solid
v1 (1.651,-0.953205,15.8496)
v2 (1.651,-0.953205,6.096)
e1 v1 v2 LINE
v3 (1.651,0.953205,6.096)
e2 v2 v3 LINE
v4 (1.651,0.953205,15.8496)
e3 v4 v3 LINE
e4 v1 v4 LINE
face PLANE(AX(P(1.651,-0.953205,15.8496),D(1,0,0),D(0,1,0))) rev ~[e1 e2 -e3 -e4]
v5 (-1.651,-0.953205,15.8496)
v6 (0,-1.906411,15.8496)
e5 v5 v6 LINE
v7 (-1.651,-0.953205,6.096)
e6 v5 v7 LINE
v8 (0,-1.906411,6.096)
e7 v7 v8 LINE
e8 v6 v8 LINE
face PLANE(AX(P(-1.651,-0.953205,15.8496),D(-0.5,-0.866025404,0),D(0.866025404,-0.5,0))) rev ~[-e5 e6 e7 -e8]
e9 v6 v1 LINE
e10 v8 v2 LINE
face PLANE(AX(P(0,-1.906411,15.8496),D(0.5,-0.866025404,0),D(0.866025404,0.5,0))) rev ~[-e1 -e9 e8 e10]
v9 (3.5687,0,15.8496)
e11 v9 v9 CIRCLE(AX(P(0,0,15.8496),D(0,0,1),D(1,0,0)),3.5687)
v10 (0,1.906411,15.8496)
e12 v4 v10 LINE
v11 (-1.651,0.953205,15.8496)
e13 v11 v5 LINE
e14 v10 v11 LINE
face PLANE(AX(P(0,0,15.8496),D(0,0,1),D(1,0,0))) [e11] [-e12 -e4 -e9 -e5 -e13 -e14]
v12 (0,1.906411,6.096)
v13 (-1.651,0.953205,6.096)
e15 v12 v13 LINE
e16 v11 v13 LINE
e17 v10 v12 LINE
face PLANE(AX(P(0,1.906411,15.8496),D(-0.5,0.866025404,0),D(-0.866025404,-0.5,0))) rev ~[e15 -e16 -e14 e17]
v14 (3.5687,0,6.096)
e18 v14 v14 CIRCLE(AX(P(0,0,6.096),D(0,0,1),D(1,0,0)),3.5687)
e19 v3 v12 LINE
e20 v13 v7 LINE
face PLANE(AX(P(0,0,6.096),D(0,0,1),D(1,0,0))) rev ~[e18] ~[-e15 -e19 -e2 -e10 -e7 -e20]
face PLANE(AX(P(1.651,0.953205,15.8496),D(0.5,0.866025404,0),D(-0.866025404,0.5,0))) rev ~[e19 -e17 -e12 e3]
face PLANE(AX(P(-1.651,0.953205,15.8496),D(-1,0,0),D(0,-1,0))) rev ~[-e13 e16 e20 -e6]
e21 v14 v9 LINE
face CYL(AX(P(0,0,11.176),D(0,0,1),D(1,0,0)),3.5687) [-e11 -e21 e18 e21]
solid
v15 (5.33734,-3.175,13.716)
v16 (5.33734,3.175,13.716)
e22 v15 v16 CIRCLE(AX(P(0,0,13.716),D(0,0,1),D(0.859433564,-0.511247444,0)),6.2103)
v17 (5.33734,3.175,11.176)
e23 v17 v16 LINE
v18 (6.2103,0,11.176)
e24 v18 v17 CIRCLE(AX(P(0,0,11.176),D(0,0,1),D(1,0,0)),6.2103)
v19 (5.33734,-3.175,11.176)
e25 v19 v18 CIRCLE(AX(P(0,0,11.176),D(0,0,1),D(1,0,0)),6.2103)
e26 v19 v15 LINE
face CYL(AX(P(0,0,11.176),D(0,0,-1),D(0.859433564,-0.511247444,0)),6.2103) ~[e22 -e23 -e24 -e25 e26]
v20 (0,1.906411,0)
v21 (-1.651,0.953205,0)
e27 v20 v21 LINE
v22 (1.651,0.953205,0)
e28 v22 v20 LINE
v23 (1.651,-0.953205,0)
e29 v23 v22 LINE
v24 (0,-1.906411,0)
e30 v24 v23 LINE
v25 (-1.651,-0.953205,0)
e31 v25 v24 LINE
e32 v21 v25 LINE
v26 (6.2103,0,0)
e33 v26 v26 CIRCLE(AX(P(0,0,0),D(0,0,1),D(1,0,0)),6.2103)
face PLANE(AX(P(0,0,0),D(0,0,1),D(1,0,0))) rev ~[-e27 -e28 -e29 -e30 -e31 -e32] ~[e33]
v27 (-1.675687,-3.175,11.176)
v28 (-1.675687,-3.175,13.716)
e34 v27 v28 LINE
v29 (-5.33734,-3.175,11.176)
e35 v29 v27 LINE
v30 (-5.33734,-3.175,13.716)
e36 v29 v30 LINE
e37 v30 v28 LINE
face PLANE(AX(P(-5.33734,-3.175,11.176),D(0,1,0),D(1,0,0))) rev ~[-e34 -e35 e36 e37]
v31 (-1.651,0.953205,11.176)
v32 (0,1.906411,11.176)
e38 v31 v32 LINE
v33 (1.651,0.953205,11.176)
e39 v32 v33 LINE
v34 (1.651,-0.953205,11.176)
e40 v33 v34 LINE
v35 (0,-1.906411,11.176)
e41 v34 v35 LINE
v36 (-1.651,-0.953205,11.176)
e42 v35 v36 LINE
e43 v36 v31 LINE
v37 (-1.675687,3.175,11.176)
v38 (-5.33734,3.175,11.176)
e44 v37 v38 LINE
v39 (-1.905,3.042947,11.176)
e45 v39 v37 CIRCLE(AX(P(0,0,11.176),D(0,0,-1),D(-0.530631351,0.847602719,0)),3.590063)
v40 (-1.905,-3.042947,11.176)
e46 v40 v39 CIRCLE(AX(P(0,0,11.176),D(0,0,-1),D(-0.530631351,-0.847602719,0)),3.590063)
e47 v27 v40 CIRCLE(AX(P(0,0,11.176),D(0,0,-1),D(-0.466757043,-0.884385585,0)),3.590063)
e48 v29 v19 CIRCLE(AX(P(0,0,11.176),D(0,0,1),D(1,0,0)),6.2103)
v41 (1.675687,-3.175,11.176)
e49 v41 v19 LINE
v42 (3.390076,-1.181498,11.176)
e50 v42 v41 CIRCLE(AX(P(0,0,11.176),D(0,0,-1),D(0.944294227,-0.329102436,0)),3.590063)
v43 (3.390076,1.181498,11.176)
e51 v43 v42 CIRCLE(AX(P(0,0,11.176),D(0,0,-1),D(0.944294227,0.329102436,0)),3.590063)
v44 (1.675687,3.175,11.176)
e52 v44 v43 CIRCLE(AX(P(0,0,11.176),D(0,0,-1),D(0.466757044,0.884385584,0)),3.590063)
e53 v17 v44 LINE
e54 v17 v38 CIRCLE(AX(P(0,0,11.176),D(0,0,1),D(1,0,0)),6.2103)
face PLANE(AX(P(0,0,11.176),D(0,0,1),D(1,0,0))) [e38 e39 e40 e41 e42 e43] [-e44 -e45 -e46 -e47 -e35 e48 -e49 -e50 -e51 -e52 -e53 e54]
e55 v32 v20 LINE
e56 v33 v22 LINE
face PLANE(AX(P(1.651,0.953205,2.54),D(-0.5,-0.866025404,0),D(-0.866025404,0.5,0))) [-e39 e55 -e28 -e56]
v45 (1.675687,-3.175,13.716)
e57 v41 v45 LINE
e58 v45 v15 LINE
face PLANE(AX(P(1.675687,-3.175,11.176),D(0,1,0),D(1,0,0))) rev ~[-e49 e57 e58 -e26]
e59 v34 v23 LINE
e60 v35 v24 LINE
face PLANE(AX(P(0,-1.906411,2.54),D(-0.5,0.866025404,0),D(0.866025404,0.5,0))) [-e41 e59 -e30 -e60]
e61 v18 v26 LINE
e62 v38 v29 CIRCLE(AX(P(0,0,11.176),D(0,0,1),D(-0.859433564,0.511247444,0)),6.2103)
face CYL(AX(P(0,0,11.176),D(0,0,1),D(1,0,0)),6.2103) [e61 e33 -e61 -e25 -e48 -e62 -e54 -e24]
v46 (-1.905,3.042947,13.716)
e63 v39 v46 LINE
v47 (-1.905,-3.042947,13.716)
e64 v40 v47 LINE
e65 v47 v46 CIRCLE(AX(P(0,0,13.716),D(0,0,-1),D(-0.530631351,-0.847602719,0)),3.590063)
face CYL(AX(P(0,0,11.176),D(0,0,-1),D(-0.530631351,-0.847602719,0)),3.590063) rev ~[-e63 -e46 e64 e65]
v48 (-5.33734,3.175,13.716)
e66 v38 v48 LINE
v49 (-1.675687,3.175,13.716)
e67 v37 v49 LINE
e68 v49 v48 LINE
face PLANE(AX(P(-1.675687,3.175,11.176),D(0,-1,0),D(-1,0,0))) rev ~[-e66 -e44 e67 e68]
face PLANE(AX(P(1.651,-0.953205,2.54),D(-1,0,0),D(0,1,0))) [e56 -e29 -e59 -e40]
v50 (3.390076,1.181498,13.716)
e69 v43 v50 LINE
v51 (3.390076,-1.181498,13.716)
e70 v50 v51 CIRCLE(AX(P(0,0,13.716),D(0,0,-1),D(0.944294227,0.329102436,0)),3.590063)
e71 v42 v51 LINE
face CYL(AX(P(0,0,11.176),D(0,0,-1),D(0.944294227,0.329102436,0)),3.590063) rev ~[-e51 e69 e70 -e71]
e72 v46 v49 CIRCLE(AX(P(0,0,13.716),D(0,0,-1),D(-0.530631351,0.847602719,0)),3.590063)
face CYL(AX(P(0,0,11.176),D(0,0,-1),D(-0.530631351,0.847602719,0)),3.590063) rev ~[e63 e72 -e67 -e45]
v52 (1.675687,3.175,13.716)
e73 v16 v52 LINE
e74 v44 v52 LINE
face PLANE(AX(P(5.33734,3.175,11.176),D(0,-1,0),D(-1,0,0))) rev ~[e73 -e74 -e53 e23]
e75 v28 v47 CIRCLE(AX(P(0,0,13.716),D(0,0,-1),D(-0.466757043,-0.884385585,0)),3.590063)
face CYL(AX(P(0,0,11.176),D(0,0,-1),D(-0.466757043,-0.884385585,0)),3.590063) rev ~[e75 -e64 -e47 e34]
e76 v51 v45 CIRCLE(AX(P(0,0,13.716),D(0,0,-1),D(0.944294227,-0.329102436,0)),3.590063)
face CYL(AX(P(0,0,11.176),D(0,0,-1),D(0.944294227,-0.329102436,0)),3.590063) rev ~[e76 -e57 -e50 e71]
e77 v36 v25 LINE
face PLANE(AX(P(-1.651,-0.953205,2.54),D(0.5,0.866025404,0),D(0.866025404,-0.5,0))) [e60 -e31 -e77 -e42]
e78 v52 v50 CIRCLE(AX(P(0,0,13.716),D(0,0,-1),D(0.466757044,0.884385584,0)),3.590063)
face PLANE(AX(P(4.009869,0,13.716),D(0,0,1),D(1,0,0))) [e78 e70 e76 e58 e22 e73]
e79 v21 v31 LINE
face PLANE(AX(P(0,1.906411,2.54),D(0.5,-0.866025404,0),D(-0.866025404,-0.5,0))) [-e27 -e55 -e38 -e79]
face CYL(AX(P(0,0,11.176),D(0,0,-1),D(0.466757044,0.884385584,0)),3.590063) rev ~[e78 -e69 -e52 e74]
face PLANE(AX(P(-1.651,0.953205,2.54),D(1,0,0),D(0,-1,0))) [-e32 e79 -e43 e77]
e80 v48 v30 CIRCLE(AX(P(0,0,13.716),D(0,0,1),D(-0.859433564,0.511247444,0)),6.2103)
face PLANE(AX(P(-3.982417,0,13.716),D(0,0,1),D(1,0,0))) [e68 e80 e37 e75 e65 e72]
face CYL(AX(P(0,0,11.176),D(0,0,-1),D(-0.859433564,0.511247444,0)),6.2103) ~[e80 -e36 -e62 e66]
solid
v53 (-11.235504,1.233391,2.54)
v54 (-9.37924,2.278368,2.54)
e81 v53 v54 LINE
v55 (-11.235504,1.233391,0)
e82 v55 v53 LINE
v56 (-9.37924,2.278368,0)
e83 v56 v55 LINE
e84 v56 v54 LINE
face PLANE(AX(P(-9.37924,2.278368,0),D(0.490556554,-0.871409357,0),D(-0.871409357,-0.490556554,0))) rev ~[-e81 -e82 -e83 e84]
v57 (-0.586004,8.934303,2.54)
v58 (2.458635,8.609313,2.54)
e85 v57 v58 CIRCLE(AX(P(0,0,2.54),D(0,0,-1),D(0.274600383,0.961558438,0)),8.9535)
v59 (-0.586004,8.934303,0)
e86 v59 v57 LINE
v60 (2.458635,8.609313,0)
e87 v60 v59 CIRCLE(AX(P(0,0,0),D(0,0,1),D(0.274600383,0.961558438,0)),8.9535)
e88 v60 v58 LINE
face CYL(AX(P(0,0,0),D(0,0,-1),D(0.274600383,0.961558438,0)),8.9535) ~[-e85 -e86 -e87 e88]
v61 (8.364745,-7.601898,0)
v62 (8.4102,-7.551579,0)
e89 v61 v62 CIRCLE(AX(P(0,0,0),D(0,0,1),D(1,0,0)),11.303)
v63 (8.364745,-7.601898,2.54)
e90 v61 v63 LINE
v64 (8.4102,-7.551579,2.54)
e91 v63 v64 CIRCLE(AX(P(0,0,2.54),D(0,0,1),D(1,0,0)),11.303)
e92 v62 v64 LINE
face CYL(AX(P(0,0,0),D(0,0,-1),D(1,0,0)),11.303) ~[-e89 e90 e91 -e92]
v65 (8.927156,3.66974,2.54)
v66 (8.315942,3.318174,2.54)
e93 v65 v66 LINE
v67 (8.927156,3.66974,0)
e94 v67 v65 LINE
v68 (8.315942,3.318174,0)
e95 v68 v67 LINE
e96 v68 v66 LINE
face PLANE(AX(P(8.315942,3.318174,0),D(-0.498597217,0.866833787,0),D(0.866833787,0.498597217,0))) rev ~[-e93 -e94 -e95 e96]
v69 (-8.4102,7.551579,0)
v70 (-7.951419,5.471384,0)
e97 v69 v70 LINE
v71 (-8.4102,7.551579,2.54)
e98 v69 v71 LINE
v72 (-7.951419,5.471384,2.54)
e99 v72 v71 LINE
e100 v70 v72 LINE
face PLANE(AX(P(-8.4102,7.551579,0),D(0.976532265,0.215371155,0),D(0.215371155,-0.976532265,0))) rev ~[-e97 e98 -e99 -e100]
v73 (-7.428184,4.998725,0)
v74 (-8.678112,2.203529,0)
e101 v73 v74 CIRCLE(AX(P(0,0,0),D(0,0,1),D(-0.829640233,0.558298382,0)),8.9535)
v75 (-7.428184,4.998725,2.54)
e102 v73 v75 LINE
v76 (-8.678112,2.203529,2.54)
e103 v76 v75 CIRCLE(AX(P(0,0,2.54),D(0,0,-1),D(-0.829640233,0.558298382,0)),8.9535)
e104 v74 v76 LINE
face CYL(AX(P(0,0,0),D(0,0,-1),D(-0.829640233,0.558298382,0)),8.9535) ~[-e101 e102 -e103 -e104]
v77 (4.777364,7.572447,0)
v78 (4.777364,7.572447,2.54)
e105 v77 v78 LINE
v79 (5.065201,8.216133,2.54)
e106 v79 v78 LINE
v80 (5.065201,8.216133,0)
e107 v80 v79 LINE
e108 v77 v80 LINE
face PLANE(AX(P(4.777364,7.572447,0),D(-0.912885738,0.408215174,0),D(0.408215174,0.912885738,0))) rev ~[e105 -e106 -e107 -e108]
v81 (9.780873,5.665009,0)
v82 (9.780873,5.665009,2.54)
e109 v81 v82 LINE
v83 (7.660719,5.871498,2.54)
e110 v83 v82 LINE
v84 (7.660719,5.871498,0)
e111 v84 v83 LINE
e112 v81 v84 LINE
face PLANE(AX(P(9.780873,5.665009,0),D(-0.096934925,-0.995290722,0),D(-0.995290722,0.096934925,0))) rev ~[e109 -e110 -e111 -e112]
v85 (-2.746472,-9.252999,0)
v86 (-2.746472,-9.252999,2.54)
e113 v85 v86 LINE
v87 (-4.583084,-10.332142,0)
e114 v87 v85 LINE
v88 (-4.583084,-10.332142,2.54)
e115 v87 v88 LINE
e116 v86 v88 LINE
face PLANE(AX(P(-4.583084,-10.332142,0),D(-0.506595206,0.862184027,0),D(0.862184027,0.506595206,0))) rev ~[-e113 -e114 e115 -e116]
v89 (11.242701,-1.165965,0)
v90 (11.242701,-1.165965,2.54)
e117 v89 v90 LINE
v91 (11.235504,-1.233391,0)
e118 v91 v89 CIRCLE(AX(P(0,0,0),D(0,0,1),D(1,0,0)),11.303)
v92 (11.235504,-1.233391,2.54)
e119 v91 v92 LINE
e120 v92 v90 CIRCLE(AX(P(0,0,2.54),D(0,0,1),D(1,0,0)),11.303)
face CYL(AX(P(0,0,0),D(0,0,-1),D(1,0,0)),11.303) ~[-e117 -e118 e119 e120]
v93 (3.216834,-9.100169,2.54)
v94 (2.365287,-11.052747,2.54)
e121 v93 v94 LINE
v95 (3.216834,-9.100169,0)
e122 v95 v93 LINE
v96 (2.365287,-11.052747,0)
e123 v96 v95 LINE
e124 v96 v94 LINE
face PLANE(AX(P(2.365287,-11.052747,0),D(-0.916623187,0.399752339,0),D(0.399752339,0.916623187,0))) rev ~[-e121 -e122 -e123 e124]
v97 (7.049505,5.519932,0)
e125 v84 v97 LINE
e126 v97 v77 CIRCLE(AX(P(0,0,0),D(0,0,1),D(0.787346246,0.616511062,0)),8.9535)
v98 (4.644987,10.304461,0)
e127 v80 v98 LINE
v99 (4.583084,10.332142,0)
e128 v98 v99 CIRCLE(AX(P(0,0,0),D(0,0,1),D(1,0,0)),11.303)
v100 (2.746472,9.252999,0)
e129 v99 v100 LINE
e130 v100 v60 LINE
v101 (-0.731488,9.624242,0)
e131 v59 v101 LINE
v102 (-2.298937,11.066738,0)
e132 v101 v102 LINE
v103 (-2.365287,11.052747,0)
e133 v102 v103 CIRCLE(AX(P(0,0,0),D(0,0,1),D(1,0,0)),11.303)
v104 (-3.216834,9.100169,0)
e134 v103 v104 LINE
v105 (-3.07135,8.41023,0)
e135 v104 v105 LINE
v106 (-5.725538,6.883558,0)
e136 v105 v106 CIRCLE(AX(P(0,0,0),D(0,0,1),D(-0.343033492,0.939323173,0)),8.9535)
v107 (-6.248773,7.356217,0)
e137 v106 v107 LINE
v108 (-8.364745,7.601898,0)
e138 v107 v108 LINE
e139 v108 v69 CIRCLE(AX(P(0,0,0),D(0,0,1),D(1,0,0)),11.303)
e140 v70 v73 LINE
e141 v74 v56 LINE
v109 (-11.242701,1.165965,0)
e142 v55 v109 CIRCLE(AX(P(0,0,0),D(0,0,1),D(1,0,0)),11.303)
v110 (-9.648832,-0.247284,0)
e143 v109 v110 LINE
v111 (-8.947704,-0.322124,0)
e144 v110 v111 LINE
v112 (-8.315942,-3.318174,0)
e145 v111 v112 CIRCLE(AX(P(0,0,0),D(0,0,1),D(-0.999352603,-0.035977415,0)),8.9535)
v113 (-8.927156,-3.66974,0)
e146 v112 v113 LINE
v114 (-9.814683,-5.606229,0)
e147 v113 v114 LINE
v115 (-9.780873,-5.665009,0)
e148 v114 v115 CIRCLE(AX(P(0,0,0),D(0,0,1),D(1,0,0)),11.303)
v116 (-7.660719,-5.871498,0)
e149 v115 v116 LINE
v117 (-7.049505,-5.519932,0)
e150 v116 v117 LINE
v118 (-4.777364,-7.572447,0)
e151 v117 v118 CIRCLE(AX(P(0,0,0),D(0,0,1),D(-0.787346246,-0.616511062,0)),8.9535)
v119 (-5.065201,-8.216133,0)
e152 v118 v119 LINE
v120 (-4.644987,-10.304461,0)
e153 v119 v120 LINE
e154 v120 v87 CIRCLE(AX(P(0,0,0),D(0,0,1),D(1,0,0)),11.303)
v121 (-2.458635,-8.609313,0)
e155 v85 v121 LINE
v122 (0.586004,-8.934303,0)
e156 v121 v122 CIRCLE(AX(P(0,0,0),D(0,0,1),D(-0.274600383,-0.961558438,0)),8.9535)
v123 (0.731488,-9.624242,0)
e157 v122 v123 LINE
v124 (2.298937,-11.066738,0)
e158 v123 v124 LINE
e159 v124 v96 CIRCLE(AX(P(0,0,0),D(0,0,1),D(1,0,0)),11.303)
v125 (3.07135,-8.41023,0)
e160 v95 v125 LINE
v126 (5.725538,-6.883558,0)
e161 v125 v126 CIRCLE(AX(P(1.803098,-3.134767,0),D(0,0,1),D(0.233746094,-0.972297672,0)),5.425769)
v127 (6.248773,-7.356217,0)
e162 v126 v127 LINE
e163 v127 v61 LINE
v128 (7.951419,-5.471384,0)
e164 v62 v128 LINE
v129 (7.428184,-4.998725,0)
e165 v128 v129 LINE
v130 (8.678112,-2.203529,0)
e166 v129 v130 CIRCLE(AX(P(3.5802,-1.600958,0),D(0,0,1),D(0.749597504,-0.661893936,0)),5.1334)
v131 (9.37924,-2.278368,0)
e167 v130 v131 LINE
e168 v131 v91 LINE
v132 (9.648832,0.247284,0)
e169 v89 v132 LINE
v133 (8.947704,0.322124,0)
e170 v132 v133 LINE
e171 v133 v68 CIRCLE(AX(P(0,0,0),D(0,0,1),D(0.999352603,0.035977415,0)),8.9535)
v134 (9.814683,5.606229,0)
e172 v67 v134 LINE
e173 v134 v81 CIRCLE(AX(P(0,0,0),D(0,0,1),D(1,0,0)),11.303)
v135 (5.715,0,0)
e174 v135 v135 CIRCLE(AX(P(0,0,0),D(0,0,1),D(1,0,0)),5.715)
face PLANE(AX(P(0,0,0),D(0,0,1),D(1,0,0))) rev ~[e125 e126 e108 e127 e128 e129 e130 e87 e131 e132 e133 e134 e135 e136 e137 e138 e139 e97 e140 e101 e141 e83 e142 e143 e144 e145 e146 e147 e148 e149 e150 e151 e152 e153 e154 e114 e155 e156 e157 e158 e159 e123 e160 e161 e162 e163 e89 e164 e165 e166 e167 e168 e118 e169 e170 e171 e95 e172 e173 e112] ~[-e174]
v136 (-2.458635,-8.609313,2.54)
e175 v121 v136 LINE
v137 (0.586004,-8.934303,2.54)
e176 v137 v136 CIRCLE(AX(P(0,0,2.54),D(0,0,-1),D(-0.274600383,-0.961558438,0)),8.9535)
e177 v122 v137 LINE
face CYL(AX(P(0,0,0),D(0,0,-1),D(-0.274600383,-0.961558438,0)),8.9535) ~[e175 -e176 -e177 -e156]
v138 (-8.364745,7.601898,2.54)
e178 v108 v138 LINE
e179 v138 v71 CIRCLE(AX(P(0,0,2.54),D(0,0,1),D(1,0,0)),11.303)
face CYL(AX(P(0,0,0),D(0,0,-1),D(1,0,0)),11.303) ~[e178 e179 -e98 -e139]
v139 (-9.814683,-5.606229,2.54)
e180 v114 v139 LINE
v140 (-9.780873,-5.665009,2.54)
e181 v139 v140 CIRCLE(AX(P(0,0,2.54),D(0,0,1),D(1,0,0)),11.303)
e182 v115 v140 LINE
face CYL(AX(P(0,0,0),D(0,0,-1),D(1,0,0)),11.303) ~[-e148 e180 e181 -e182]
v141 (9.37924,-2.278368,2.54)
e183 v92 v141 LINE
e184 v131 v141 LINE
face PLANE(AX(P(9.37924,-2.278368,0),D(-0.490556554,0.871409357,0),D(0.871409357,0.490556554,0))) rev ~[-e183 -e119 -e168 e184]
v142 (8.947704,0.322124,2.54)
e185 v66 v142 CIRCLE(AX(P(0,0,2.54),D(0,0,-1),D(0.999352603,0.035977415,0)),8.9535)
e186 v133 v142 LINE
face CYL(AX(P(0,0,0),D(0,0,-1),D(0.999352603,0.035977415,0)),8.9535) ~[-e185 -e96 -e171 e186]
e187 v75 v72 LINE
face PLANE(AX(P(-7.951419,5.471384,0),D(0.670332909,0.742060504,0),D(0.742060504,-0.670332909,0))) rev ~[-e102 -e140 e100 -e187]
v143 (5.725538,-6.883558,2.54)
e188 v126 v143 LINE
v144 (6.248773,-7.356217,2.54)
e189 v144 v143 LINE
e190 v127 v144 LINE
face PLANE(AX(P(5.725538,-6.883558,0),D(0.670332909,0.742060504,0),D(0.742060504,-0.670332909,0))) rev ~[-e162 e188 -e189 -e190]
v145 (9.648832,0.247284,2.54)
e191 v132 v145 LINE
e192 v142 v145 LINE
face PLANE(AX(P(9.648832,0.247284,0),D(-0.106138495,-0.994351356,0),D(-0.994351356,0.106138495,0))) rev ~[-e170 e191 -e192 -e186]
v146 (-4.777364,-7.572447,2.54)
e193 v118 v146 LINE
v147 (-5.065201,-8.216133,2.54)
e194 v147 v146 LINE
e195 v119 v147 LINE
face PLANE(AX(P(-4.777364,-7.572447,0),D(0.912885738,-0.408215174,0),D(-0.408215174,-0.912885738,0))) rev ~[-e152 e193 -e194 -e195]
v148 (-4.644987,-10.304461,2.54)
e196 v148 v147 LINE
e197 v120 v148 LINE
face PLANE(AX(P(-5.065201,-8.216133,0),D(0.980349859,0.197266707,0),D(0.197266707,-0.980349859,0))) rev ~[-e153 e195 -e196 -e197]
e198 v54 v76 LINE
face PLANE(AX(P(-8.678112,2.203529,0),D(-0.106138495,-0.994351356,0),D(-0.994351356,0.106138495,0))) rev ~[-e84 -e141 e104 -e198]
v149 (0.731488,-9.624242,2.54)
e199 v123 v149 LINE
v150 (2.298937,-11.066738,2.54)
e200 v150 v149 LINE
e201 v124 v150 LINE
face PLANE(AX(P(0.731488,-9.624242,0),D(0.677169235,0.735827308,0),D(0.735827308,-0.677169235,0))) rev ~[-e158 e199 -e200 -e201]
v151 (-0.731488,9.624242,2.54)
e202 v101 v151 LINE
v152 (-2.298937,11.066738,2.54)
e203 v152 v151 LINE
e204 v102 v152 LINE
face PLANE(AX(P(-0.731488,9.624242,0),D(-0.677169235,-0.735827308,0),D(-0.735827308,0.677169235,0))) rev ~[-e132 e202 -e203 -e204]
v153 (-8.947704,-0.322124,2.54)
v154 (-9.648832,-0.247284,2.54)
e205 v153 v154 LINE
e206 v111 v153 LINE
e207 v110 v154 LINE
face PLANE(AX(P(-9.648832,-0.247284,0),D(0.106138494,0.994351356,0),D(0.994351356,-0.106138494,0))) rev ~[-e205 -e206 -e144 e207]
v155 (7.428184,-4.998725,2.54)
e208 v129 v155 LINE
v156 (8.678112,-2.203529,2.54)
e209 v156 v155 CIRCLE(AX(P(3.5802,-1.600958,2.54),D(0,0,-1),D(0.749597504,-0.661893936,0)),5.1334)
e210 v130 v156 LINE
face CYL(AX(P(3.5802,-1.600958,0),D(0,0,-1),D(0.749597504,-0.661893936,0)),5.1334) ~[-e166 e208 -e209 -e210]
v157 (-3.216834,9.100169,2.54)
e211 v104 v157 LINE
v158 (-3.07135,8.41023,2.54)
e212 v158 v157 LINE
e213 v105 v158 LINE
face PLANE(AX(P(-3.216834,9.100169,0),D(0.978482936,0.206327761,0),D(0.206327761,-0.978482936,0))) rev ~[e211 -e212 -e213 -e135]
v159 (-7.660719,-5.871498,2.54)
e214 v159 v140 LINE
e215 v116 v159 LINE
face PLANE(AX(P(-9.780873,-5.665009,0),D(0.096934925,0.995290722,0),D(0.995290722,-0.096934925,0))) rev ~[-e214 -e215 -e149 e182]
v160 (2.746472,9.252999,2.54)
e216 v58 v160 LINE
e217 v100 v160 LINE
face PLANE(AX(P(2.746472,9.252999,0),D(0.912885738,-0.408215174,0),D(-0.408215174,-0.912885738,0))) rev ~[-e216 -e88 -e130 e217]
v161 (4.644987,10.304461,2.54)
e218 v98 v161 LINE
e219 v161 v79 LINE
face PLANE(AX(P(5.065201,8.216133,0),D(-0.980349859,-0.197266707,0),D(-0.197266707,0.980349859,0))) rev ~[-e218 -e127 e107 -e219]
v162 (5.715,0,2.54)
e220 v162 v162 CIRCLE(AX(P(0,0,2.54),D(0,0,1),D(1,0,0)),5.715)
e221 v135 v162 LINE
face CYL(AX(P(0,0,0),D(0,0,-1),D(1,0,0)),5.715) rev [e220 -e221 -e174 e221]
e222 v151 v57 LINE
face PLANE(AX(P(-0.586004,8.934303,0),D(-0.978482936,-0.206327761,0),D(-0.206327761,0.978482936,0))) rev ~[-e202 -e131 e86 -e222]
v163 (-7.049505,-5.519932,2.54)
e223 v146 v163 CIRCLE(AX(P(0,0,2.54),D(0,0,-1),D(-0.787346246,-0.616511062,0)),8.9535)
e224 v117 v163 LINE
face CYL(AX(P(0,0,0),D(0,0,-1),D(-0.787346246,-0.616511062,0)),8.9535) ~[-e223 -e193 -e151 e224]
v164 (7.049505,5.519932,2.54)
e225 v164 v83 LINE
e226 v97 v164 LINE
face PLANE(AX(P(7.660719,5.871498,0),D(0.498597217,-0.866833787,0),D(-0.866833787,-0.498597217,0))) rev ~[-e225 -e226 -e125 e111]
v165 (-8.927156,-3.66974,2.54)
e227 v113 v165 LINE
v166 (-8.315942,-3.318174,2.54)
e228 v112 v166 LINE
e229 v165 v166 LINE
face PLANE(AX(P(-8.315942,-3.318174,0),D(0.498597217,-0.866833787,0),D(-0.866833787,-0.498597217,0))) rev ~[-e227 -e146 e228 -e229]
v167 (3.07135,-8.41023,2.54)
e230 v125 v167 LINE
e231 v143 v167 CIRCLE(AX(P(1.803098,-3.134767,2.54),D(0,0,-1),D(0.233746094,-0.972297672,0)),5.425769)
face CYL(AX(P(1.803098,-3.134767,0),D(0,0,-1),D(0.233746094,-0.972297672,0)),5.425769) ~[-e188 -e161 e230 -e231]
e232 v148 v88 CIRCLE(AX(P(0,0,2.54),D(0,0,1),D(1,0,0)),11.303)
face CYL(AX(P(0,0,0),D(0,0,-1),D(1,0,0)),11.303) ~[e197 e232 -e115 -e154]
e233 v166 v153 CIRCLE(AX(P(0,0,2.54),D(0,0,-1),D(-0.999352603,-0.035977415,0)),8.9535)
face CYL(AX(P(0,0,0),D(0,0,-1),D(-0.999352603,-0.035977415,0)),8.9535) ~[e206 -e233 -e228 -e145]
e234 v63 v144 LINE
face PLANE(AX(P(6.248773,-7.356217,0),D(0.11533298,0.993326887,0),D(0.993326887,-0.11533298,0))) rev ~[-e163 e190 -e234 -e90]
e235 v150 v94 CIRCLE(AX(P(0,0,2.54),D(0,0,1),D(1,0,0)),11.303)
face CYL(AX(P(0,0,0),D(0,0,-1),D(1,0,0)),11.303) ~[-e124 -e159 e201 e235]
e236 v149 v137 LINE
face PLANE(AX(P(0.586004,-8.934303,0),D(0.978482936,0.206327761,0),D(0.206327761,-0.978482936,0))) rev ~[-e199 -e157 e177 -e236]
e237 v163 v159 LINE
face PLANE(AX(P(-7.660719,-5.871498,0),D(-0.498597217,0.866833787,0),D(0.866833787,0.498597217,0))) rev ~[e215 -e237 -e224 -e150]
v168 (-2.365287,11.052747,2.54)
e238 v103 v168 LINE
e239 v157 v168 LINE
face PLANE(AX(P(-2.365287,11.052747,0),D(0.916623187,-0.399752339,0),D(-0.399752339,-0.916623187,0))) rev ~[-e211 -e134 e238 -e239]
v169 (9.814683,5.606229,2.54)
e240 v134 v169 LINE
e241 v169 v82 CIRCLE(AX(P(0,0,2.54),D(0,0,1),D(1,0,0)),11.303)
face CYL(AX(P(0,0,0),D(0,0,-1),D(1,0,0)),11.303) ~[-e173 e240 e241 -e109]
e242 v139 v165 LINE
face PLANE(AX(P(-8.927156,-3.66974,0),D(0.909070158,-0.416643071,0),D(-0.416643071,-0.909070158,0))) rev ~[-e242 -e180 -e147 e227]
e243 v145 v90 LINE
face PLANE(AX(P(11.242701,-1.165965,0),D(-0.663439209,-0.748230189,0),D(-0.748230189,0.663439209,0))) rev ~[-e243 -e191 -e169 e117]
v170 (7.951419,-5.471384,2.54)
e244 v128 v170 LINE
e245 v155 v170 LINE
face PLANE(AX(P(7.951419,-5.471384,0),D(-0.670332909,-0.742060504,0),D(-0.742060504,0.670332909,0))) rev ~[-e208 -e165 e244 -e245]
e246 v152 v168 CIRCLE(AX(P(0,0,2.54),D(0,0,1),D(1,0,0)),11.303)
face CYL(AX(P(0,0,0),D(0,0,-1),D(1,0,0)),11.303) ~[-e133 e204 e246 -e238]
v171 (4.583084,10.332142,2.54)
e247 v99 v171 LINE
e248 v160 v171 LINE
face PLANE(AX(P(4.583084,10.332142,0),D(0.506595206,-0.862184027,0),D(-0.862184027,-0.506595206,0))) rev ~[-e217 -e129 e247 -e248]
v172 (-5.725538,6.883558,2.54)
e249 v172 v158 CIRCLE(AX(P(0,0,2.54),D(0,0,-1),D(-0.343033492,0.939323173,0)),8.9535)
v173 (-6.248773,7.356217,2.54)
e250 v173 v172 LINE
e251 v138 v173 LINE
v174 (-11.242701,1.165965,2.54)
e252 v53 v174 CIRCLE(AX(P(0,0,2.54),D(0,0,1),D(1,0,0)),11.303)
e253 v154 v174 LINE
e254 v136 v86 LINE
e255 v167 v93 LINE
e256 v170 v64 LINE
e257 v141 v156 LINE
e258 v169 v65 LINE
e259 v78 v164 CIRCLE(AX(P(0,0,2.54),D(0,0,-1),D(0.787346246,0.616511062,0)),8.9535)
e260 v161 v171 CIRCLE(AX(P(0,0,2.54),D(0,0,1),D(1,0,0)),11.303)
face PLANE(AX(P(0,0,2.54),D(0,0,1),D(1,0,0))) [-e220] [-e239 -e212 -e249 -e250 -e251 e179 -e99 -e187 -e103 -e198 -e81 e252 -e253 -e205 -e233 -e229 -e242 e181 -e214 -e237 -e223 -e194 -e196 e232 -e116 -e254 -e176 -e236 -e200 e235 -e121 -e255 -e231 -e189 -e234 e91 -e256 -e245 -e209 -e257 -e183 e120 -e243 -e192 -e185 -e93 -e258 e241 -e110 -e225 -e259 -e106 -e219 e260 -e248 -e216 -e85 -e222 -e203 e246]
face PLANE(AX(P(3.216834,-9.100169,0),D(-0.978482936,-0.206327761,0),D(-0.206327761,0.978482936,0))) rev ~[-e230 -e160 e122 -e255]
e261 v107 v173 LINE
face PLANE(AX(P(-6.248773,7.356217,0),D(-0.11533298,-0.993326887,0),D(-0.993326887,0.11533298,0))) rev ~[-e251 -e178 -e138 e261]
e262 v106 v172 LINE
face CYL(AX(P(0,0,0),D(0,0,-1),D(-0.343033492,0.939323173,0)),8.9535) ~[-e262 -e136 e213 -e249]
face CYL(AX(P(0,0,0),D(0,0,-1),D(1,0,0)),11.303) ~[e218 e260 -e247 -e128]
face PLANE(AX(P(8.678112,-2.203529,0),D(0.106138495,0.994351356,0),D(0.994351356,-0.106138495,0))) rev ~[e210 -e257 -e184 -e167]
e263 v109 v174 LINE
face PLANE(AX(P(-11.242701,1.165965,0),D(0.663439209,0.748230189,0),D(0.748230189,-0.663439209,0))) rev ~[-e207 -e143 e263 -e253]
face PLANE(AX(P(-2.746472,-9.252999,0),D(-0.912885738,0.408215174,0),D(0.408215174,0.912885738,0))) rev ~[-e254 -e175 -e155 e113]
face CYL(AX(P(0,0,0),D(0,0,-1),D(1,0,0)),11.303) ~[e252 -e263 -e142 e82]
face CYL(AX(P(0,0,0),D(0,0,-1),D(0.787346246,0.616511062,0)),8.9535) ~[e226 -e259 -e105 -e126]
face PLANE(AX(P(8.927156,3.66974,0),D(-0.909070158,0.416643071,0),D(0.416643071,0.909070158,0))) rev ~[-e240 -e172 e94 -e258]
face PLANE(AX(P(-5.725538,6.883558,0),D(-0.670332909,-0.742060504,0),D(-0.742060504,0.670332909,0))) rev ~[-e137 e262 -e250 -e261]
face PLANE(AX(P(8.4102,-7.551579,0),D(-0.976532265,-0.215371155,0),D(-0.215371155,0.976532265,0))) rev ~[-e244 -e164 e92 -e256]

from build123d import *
from build123d import SkipClean  # not in build123d's __all__

# Parameters (mm, degrees)
F0_R           = 11.303
F0_R_2         = 5.715
F1_DEPTH       = 2.54
F5_R           = 3.5687
F6_DEPTH       = 4.6736
F6_DEPTH_BACK  = 5.08
F8_DEPTH       = 50.8
F10_DEPTH      = 25.4
F13_DEPTH      = 25.4
F4_R           = 6.2103
F15_DEPTH      = 11.176
F16_DEPTH      = 50.8
F16_DEPTH_BACK = 50.8
F18_DEPTH      = 2.54


with BuildPart() as f1:
    # F0 (on Top) → F1 (new body)
    with BuildSketch(Plane.XY):
        Circle(F0_R)
        Circle(F0_R_2, mode=Mode.SUBTRACT)
    extrude(amount=F1_DEPTH)

    # F9 (on face) → F10 (cut)
    with BuildSketch(Plane(origin=(0, 0, 0), x_dir=(1, 0, 0), z_dir=(0, 0, -1))):
        with BuildLine():
            Line((-8.9271557155, 3.6697404311), (-9.8146830534, 5.6062291749))
            ThreePointArc((-9.8146830534, 5.6062291749), (-11.0597926204, 2.3321226799), (-11.242701421, -1.1659647326))
            Line((-11.242701421, -1.1659647326), (-9.6488317662, 0.2472843445))
            Line((-9.6488317662, 0.2472843445), (-8.9477035333, 0.3221237808))
            ThreePointArc((-8.9477035333, 0.3221237808), (-8.7608469633, 1.847355606), (-8.3159415428, 3.3181739717))
            Line((-8.3159415428, 3.3181739717), (-8.9271557155, 3.6697404311))
        make_face()
        with BuildLine():
            Line((-4.7773643073, 7.5724469312), (-5.0652013801, 8.2161328482))
            Line((-5.0652013801, 8.2161328482), (-4.6449865546, 10.3044606316))
            ThreePointArc((-4.6449865546, 10.3044606316), (-7.5767728664, 8.3875098767), (-9.7808733868, 5.6650088077))
            Line((-9.7808733868, 5.6650088077), (-7.6607187839, 5.8714982512))
            Line((-7.6607187839, 5.8714982512), (-7.0495046113, 5.5199317918))
            ThreePointArc((-7.0495046113, 5.5199317918), (-6.0018256975, 6.6440387225), (-4.7773643073, 7.5724469312))
        make_face()
        with BuildLine():
            ThreePointArc((2.2989369307, 11.0667383627), (-1.1996834025, 11.2391533815), (-4.5830841585, 10.33214153))
            Line((-4.5830841585, 10.33214153), (-2.7464716044, 9.2529993908))
            Line((-2.7464716044, 9.2529993908), (-2.4586345316, 8.6093134738))
            ThreePointArc((-2.4586345316, 8.6093134738), (-0.9503110098, 8.9029248696), (0.586003717, 8.934302541))
            Line((0.586003717, 8.934302541), (0.7314877226, 9.6242417733))
            Line((0.7314877226, 9.6242417733), (2.2989369307, 11.0667383627))
        make_face()
        with BuildLine():
            ThreePointArc((8.3647446465, 7.6018981839), (5.6356443454, 9.7978222995), (2.3652874451, 11.0527473644))
            Line((2.3652874451, 11.0527473644), (3.2168343788, 9.100169261))
            Line((3.2168343788, 9.100169261), (3.0713503732, 8.4102300286))
            ThreePointArc((3.0713503732, 8.4102300286), (4.5083713952, 7.8380073479), (5.7255382389, 6.8835582459))
            Line((5.7255382389, 6.8835582459), (6.2487733776, 7.356217457))
            Line((6.2487733776, 7.356217457), (8.3647446465, 7.6018981839))
        make_face()
        with BuildLine():
            ThreePointArc((11.2355042146, 1.2333912778), (10.3183475019, 4.6140561147), (8.4101996378, 7.5515793747))
            Line((8.4101996378, 7.5515793747), (7.9514189656, 5.4713837769))
            Line((7.9514189656, 5.4713837769), (7.4281838269, 4.9987245658))
            ThreePointArc((7.4281838269, 4.9987245658), (8.2664076362, 3.6964900333), (8.6781117575, 2.2035286644))
            Line((8.6781117575, 2.2035286644), (9.3792399904, 2.2783681008))
            Line((9.3792399904, 2.2783681008), (11.2355042146, 1.2333912778))
        make_face()
        with BuildLine():
            ThreePointArc((11.303, 0), (11.2879152894, 0.5837614402), (11.242701421, 1.1659647326))
            Line((11.242701421, 1.1659647326), (9.6488317662, -0.2472843445))
            Line((9.6488317662, -0.2472843445), (8.9477035333, -0.3221237809))
            ThreePointArc((8.9477035333, -0.3221237808), (8.7608469633, -1.847355606), (8.3159415428, -3.3181739717))
            Line((8.3159415428, -3.3181739717), (8.9271557155, -3.6697404311))
            Line((8.9271557155, -3.6697404311), (9.8146830534, -5.6062291749))
            ThreePointArc((9.8146830534, -5.6062291749), (10.9245862977, -2.900210893), (11.303, 0))
        make_face()
        with BuildLine():
            ThreePointArc((4.6449865546, -10.3044606316), (7.5767728664, -8.3875098767), (9.7808733868, -5.6650088077))
            Line((9.7808733868, -5.6650088077), (7.6607187839, -5.8714982512))
            Line((7.6607187839, -5.8714982512), (7.0495046113, -5.5199317918))
            ThreePointArc((7.0495046113, -5.5199317918), (6.0018256975, -6.6440387225), (4.7773643073, -7.5724469312))
            Line((4.7773643073, -7.5724469312), (5.0652013801, -8.2161328482))
            Line((5.0652013801, -8.2161328482), (4.6449865546, -10.3044606316))
        make_face()
        with BuildLine():
            Line((-0.7314877226, -9.6242417733), (-2.2989369307, -11.0667383627))
            ThreePointArc((-2.2989369307, -11.0667383627), (1.1996834025, -11.2391533815), (4.5830841585, -10.33214153))
            Line((4.5830841585, -10.33214153), (2.7464716044, -9.2529993908))
            Line((2.7464716044, -9.2529993908), (2.4586345316, -8.6093134738))
            ThreePointArc((2.4586345316, -8.6093134738), (0.9503110098, -8.9029248696), (-0.586003717, -8.934302541))
            Line((-0.586003717, -8.934302541), (-0.7314877226, -9.6242417733))
        make_face()
        with BuildLine():
            Line((-6.2487733776, -7.356217457), (-8.3647446465, -7.6018981839))
            ThreePointArc((-8.3647446465, -7.6018981839), (-5.6356443454, -9.7978222995), (-2.3652874451, -11.0527473644))
            Line((-2.3652874451, -11.0527473644), (-3.2168343788, -9.100169261))
            Line((-3.2168343788, -9.100169261), (-3.0713503732, -8.4102300286))
            ThreePointArc((-3.0713503732, -8.4102300286), (-4.4641901838, -7.7611963159), (-5.7255382389, -6.8835582459))
            Line((-5.7255382389, -6.8835582459), (-6.2487733776, -7.356217457))
        make_face()
        with BuildLine():
            Line((-9.3792399904, -2.2783681008), (-11.2355042146, -1.2333912778))
            ThreePointArc((-11.2355042146, -1.2333912778), (-10.3183475019, -4.6140561147), (-8.4101996378, -7.5515793747))
            Line((-8.4101996378, -7.5515793747), (-7.9514189656, -5.4713837769))
            Line((-7.9514189656, -5.4713837769), (-7.4281838269, -4.9987245658))
            ThreePointArc((-7.4281838269, -4.9987245658), (-8.1735224594, -3.6549545628), (-8.6781117575, -2.2035286644))
            Line((-8.6781117575, -2.2035286644), (-9.3792399904, -2.2783681008))
        make_face()
    extrude(amount=-F10_DEPTH, mode=Mode.SUBTRACT)


with BuildPart() as f6:
    # F5 (on offset) → F6 (new body, two sides)
    with BuildSketch(Plane.XY.offset(11.176)) as f6_sk:
        Circle(F5_R)
    extrude(amount=F6_DEPTH)
    extrude(f6_sk.sketch, amount=-F6_DEPTH_BACK)

    # F7 (on offset) → F8 (cut)
    with BuildSketch(Plane.XY.offset(11.176)):
        Polygon((1.5165992773, 0.4486275472), (0.369776786, 1.5377272751), (-1.1468224914, 1.089099728), (-1.5165992773, -0.4486275472), (-0.369776786, -1.5377272751), (1.1468224914, -1.089099728), align=None)
    extrude(amount=-F8_DEPTH, mode=Mode.SUBTRACT)

    # F12 (on face) → F13 (cut)
    with BuildSketch(Plane.XY.offset(15.8496)):
        Polygon((0, 1.9064105889), (-1.651, 0.9532052944), (-1.651, -0.9532052944), (0, -1.9064105889), (1.651, -0.9532052944), (1.651, 0.9532052944), align=None)
    extrude(amount=-F13_DEPTH, mode=Mode.SUBTRACT)


with BuildPart() as f15:
    # F4 (on offset) → F15 (new body, through all)
    with BuildSketch(Plane.XY.offset(11.176)):
        Circle(F4_R)
    extrude(amount=-F15_DEPTH)

    # F14 (on face) → F16 (cut, two sides)
    with BuildSketch(Plane.XY.offset(2.54)) as f16_sk:
        Polygon((0, 1.9064105889), (-1.651, 0.9532052944), (-1.651, -0.9532052944), (0, -1.9064105889), (1.651, -0.9532052944), (1.651, 0.9532052944), align=None)
    extrude(amount=-F16_DEPTH, mode=Mode.SUBTRACT)
    extrude(f16_sk.sketch, amount=F16_DEPTH_BACK, mode=Mode.SUBTRACT)

    # F17 (on face) → F18 (join)
    with BuildSketch(Plane.XY.offset(11.176)):
        with BuildLine():
            ThreePointArc((-1.6756872114, -3.175), (-1.7915606918, -3.1110870959), (-1.905, -3.0429471948))
            ThreePointArc((-1.905, -3.0429471948), (-3.5900630399, 0), (-1.905, 3.0429471948))
            ThreePointArc((-1.905, 3.0429471948), (-1.7915606918, 3.1110870959), (-1.6756872114, 3.175))
            Line((-1.6756872114, 3.175), (-5.3373402637, 3.175))
            ThreePointArc((-5.3373402637, 3.175), (-6.2103, 0), (-5.3373402637, -3.175))
            Line((-5.3373402637, -3.175), (-1.6756872114, -3.175))
        make_face()
        with BuildLine():
            ThreePointArc((1.6756872114, 3.175), (2.7219479771, 2.340844258), (3.3900758016, 1.1814984934))
            ThreePointArc((3.3900758016, 1.1814984934), (3.5900630399, 0), (3.3900758016, -1.1814984934))
            ThreePointArc((3.3900758016, -1.1814984934), (2.7219479771, -2.340844258), (1.6756872114, -3.175))
            Line((1.6756872114, -3.175), (5.3373402637, -3.175))
            ThreePointArc((5.3373402637, -3.175), (6.2103, 0), (5.3373402637, 3.175))
            Line((5.3373402637, 3.175), (1.6756872114, 3.175))
        make_face()
    with SkipClean():  # cleaning this boolean's faces spoils the solid; the shape is the same uncleaned
        extrude(amount=F18_DEPTH)


solid = Compound([f1.part, f6.part, f15.part])
